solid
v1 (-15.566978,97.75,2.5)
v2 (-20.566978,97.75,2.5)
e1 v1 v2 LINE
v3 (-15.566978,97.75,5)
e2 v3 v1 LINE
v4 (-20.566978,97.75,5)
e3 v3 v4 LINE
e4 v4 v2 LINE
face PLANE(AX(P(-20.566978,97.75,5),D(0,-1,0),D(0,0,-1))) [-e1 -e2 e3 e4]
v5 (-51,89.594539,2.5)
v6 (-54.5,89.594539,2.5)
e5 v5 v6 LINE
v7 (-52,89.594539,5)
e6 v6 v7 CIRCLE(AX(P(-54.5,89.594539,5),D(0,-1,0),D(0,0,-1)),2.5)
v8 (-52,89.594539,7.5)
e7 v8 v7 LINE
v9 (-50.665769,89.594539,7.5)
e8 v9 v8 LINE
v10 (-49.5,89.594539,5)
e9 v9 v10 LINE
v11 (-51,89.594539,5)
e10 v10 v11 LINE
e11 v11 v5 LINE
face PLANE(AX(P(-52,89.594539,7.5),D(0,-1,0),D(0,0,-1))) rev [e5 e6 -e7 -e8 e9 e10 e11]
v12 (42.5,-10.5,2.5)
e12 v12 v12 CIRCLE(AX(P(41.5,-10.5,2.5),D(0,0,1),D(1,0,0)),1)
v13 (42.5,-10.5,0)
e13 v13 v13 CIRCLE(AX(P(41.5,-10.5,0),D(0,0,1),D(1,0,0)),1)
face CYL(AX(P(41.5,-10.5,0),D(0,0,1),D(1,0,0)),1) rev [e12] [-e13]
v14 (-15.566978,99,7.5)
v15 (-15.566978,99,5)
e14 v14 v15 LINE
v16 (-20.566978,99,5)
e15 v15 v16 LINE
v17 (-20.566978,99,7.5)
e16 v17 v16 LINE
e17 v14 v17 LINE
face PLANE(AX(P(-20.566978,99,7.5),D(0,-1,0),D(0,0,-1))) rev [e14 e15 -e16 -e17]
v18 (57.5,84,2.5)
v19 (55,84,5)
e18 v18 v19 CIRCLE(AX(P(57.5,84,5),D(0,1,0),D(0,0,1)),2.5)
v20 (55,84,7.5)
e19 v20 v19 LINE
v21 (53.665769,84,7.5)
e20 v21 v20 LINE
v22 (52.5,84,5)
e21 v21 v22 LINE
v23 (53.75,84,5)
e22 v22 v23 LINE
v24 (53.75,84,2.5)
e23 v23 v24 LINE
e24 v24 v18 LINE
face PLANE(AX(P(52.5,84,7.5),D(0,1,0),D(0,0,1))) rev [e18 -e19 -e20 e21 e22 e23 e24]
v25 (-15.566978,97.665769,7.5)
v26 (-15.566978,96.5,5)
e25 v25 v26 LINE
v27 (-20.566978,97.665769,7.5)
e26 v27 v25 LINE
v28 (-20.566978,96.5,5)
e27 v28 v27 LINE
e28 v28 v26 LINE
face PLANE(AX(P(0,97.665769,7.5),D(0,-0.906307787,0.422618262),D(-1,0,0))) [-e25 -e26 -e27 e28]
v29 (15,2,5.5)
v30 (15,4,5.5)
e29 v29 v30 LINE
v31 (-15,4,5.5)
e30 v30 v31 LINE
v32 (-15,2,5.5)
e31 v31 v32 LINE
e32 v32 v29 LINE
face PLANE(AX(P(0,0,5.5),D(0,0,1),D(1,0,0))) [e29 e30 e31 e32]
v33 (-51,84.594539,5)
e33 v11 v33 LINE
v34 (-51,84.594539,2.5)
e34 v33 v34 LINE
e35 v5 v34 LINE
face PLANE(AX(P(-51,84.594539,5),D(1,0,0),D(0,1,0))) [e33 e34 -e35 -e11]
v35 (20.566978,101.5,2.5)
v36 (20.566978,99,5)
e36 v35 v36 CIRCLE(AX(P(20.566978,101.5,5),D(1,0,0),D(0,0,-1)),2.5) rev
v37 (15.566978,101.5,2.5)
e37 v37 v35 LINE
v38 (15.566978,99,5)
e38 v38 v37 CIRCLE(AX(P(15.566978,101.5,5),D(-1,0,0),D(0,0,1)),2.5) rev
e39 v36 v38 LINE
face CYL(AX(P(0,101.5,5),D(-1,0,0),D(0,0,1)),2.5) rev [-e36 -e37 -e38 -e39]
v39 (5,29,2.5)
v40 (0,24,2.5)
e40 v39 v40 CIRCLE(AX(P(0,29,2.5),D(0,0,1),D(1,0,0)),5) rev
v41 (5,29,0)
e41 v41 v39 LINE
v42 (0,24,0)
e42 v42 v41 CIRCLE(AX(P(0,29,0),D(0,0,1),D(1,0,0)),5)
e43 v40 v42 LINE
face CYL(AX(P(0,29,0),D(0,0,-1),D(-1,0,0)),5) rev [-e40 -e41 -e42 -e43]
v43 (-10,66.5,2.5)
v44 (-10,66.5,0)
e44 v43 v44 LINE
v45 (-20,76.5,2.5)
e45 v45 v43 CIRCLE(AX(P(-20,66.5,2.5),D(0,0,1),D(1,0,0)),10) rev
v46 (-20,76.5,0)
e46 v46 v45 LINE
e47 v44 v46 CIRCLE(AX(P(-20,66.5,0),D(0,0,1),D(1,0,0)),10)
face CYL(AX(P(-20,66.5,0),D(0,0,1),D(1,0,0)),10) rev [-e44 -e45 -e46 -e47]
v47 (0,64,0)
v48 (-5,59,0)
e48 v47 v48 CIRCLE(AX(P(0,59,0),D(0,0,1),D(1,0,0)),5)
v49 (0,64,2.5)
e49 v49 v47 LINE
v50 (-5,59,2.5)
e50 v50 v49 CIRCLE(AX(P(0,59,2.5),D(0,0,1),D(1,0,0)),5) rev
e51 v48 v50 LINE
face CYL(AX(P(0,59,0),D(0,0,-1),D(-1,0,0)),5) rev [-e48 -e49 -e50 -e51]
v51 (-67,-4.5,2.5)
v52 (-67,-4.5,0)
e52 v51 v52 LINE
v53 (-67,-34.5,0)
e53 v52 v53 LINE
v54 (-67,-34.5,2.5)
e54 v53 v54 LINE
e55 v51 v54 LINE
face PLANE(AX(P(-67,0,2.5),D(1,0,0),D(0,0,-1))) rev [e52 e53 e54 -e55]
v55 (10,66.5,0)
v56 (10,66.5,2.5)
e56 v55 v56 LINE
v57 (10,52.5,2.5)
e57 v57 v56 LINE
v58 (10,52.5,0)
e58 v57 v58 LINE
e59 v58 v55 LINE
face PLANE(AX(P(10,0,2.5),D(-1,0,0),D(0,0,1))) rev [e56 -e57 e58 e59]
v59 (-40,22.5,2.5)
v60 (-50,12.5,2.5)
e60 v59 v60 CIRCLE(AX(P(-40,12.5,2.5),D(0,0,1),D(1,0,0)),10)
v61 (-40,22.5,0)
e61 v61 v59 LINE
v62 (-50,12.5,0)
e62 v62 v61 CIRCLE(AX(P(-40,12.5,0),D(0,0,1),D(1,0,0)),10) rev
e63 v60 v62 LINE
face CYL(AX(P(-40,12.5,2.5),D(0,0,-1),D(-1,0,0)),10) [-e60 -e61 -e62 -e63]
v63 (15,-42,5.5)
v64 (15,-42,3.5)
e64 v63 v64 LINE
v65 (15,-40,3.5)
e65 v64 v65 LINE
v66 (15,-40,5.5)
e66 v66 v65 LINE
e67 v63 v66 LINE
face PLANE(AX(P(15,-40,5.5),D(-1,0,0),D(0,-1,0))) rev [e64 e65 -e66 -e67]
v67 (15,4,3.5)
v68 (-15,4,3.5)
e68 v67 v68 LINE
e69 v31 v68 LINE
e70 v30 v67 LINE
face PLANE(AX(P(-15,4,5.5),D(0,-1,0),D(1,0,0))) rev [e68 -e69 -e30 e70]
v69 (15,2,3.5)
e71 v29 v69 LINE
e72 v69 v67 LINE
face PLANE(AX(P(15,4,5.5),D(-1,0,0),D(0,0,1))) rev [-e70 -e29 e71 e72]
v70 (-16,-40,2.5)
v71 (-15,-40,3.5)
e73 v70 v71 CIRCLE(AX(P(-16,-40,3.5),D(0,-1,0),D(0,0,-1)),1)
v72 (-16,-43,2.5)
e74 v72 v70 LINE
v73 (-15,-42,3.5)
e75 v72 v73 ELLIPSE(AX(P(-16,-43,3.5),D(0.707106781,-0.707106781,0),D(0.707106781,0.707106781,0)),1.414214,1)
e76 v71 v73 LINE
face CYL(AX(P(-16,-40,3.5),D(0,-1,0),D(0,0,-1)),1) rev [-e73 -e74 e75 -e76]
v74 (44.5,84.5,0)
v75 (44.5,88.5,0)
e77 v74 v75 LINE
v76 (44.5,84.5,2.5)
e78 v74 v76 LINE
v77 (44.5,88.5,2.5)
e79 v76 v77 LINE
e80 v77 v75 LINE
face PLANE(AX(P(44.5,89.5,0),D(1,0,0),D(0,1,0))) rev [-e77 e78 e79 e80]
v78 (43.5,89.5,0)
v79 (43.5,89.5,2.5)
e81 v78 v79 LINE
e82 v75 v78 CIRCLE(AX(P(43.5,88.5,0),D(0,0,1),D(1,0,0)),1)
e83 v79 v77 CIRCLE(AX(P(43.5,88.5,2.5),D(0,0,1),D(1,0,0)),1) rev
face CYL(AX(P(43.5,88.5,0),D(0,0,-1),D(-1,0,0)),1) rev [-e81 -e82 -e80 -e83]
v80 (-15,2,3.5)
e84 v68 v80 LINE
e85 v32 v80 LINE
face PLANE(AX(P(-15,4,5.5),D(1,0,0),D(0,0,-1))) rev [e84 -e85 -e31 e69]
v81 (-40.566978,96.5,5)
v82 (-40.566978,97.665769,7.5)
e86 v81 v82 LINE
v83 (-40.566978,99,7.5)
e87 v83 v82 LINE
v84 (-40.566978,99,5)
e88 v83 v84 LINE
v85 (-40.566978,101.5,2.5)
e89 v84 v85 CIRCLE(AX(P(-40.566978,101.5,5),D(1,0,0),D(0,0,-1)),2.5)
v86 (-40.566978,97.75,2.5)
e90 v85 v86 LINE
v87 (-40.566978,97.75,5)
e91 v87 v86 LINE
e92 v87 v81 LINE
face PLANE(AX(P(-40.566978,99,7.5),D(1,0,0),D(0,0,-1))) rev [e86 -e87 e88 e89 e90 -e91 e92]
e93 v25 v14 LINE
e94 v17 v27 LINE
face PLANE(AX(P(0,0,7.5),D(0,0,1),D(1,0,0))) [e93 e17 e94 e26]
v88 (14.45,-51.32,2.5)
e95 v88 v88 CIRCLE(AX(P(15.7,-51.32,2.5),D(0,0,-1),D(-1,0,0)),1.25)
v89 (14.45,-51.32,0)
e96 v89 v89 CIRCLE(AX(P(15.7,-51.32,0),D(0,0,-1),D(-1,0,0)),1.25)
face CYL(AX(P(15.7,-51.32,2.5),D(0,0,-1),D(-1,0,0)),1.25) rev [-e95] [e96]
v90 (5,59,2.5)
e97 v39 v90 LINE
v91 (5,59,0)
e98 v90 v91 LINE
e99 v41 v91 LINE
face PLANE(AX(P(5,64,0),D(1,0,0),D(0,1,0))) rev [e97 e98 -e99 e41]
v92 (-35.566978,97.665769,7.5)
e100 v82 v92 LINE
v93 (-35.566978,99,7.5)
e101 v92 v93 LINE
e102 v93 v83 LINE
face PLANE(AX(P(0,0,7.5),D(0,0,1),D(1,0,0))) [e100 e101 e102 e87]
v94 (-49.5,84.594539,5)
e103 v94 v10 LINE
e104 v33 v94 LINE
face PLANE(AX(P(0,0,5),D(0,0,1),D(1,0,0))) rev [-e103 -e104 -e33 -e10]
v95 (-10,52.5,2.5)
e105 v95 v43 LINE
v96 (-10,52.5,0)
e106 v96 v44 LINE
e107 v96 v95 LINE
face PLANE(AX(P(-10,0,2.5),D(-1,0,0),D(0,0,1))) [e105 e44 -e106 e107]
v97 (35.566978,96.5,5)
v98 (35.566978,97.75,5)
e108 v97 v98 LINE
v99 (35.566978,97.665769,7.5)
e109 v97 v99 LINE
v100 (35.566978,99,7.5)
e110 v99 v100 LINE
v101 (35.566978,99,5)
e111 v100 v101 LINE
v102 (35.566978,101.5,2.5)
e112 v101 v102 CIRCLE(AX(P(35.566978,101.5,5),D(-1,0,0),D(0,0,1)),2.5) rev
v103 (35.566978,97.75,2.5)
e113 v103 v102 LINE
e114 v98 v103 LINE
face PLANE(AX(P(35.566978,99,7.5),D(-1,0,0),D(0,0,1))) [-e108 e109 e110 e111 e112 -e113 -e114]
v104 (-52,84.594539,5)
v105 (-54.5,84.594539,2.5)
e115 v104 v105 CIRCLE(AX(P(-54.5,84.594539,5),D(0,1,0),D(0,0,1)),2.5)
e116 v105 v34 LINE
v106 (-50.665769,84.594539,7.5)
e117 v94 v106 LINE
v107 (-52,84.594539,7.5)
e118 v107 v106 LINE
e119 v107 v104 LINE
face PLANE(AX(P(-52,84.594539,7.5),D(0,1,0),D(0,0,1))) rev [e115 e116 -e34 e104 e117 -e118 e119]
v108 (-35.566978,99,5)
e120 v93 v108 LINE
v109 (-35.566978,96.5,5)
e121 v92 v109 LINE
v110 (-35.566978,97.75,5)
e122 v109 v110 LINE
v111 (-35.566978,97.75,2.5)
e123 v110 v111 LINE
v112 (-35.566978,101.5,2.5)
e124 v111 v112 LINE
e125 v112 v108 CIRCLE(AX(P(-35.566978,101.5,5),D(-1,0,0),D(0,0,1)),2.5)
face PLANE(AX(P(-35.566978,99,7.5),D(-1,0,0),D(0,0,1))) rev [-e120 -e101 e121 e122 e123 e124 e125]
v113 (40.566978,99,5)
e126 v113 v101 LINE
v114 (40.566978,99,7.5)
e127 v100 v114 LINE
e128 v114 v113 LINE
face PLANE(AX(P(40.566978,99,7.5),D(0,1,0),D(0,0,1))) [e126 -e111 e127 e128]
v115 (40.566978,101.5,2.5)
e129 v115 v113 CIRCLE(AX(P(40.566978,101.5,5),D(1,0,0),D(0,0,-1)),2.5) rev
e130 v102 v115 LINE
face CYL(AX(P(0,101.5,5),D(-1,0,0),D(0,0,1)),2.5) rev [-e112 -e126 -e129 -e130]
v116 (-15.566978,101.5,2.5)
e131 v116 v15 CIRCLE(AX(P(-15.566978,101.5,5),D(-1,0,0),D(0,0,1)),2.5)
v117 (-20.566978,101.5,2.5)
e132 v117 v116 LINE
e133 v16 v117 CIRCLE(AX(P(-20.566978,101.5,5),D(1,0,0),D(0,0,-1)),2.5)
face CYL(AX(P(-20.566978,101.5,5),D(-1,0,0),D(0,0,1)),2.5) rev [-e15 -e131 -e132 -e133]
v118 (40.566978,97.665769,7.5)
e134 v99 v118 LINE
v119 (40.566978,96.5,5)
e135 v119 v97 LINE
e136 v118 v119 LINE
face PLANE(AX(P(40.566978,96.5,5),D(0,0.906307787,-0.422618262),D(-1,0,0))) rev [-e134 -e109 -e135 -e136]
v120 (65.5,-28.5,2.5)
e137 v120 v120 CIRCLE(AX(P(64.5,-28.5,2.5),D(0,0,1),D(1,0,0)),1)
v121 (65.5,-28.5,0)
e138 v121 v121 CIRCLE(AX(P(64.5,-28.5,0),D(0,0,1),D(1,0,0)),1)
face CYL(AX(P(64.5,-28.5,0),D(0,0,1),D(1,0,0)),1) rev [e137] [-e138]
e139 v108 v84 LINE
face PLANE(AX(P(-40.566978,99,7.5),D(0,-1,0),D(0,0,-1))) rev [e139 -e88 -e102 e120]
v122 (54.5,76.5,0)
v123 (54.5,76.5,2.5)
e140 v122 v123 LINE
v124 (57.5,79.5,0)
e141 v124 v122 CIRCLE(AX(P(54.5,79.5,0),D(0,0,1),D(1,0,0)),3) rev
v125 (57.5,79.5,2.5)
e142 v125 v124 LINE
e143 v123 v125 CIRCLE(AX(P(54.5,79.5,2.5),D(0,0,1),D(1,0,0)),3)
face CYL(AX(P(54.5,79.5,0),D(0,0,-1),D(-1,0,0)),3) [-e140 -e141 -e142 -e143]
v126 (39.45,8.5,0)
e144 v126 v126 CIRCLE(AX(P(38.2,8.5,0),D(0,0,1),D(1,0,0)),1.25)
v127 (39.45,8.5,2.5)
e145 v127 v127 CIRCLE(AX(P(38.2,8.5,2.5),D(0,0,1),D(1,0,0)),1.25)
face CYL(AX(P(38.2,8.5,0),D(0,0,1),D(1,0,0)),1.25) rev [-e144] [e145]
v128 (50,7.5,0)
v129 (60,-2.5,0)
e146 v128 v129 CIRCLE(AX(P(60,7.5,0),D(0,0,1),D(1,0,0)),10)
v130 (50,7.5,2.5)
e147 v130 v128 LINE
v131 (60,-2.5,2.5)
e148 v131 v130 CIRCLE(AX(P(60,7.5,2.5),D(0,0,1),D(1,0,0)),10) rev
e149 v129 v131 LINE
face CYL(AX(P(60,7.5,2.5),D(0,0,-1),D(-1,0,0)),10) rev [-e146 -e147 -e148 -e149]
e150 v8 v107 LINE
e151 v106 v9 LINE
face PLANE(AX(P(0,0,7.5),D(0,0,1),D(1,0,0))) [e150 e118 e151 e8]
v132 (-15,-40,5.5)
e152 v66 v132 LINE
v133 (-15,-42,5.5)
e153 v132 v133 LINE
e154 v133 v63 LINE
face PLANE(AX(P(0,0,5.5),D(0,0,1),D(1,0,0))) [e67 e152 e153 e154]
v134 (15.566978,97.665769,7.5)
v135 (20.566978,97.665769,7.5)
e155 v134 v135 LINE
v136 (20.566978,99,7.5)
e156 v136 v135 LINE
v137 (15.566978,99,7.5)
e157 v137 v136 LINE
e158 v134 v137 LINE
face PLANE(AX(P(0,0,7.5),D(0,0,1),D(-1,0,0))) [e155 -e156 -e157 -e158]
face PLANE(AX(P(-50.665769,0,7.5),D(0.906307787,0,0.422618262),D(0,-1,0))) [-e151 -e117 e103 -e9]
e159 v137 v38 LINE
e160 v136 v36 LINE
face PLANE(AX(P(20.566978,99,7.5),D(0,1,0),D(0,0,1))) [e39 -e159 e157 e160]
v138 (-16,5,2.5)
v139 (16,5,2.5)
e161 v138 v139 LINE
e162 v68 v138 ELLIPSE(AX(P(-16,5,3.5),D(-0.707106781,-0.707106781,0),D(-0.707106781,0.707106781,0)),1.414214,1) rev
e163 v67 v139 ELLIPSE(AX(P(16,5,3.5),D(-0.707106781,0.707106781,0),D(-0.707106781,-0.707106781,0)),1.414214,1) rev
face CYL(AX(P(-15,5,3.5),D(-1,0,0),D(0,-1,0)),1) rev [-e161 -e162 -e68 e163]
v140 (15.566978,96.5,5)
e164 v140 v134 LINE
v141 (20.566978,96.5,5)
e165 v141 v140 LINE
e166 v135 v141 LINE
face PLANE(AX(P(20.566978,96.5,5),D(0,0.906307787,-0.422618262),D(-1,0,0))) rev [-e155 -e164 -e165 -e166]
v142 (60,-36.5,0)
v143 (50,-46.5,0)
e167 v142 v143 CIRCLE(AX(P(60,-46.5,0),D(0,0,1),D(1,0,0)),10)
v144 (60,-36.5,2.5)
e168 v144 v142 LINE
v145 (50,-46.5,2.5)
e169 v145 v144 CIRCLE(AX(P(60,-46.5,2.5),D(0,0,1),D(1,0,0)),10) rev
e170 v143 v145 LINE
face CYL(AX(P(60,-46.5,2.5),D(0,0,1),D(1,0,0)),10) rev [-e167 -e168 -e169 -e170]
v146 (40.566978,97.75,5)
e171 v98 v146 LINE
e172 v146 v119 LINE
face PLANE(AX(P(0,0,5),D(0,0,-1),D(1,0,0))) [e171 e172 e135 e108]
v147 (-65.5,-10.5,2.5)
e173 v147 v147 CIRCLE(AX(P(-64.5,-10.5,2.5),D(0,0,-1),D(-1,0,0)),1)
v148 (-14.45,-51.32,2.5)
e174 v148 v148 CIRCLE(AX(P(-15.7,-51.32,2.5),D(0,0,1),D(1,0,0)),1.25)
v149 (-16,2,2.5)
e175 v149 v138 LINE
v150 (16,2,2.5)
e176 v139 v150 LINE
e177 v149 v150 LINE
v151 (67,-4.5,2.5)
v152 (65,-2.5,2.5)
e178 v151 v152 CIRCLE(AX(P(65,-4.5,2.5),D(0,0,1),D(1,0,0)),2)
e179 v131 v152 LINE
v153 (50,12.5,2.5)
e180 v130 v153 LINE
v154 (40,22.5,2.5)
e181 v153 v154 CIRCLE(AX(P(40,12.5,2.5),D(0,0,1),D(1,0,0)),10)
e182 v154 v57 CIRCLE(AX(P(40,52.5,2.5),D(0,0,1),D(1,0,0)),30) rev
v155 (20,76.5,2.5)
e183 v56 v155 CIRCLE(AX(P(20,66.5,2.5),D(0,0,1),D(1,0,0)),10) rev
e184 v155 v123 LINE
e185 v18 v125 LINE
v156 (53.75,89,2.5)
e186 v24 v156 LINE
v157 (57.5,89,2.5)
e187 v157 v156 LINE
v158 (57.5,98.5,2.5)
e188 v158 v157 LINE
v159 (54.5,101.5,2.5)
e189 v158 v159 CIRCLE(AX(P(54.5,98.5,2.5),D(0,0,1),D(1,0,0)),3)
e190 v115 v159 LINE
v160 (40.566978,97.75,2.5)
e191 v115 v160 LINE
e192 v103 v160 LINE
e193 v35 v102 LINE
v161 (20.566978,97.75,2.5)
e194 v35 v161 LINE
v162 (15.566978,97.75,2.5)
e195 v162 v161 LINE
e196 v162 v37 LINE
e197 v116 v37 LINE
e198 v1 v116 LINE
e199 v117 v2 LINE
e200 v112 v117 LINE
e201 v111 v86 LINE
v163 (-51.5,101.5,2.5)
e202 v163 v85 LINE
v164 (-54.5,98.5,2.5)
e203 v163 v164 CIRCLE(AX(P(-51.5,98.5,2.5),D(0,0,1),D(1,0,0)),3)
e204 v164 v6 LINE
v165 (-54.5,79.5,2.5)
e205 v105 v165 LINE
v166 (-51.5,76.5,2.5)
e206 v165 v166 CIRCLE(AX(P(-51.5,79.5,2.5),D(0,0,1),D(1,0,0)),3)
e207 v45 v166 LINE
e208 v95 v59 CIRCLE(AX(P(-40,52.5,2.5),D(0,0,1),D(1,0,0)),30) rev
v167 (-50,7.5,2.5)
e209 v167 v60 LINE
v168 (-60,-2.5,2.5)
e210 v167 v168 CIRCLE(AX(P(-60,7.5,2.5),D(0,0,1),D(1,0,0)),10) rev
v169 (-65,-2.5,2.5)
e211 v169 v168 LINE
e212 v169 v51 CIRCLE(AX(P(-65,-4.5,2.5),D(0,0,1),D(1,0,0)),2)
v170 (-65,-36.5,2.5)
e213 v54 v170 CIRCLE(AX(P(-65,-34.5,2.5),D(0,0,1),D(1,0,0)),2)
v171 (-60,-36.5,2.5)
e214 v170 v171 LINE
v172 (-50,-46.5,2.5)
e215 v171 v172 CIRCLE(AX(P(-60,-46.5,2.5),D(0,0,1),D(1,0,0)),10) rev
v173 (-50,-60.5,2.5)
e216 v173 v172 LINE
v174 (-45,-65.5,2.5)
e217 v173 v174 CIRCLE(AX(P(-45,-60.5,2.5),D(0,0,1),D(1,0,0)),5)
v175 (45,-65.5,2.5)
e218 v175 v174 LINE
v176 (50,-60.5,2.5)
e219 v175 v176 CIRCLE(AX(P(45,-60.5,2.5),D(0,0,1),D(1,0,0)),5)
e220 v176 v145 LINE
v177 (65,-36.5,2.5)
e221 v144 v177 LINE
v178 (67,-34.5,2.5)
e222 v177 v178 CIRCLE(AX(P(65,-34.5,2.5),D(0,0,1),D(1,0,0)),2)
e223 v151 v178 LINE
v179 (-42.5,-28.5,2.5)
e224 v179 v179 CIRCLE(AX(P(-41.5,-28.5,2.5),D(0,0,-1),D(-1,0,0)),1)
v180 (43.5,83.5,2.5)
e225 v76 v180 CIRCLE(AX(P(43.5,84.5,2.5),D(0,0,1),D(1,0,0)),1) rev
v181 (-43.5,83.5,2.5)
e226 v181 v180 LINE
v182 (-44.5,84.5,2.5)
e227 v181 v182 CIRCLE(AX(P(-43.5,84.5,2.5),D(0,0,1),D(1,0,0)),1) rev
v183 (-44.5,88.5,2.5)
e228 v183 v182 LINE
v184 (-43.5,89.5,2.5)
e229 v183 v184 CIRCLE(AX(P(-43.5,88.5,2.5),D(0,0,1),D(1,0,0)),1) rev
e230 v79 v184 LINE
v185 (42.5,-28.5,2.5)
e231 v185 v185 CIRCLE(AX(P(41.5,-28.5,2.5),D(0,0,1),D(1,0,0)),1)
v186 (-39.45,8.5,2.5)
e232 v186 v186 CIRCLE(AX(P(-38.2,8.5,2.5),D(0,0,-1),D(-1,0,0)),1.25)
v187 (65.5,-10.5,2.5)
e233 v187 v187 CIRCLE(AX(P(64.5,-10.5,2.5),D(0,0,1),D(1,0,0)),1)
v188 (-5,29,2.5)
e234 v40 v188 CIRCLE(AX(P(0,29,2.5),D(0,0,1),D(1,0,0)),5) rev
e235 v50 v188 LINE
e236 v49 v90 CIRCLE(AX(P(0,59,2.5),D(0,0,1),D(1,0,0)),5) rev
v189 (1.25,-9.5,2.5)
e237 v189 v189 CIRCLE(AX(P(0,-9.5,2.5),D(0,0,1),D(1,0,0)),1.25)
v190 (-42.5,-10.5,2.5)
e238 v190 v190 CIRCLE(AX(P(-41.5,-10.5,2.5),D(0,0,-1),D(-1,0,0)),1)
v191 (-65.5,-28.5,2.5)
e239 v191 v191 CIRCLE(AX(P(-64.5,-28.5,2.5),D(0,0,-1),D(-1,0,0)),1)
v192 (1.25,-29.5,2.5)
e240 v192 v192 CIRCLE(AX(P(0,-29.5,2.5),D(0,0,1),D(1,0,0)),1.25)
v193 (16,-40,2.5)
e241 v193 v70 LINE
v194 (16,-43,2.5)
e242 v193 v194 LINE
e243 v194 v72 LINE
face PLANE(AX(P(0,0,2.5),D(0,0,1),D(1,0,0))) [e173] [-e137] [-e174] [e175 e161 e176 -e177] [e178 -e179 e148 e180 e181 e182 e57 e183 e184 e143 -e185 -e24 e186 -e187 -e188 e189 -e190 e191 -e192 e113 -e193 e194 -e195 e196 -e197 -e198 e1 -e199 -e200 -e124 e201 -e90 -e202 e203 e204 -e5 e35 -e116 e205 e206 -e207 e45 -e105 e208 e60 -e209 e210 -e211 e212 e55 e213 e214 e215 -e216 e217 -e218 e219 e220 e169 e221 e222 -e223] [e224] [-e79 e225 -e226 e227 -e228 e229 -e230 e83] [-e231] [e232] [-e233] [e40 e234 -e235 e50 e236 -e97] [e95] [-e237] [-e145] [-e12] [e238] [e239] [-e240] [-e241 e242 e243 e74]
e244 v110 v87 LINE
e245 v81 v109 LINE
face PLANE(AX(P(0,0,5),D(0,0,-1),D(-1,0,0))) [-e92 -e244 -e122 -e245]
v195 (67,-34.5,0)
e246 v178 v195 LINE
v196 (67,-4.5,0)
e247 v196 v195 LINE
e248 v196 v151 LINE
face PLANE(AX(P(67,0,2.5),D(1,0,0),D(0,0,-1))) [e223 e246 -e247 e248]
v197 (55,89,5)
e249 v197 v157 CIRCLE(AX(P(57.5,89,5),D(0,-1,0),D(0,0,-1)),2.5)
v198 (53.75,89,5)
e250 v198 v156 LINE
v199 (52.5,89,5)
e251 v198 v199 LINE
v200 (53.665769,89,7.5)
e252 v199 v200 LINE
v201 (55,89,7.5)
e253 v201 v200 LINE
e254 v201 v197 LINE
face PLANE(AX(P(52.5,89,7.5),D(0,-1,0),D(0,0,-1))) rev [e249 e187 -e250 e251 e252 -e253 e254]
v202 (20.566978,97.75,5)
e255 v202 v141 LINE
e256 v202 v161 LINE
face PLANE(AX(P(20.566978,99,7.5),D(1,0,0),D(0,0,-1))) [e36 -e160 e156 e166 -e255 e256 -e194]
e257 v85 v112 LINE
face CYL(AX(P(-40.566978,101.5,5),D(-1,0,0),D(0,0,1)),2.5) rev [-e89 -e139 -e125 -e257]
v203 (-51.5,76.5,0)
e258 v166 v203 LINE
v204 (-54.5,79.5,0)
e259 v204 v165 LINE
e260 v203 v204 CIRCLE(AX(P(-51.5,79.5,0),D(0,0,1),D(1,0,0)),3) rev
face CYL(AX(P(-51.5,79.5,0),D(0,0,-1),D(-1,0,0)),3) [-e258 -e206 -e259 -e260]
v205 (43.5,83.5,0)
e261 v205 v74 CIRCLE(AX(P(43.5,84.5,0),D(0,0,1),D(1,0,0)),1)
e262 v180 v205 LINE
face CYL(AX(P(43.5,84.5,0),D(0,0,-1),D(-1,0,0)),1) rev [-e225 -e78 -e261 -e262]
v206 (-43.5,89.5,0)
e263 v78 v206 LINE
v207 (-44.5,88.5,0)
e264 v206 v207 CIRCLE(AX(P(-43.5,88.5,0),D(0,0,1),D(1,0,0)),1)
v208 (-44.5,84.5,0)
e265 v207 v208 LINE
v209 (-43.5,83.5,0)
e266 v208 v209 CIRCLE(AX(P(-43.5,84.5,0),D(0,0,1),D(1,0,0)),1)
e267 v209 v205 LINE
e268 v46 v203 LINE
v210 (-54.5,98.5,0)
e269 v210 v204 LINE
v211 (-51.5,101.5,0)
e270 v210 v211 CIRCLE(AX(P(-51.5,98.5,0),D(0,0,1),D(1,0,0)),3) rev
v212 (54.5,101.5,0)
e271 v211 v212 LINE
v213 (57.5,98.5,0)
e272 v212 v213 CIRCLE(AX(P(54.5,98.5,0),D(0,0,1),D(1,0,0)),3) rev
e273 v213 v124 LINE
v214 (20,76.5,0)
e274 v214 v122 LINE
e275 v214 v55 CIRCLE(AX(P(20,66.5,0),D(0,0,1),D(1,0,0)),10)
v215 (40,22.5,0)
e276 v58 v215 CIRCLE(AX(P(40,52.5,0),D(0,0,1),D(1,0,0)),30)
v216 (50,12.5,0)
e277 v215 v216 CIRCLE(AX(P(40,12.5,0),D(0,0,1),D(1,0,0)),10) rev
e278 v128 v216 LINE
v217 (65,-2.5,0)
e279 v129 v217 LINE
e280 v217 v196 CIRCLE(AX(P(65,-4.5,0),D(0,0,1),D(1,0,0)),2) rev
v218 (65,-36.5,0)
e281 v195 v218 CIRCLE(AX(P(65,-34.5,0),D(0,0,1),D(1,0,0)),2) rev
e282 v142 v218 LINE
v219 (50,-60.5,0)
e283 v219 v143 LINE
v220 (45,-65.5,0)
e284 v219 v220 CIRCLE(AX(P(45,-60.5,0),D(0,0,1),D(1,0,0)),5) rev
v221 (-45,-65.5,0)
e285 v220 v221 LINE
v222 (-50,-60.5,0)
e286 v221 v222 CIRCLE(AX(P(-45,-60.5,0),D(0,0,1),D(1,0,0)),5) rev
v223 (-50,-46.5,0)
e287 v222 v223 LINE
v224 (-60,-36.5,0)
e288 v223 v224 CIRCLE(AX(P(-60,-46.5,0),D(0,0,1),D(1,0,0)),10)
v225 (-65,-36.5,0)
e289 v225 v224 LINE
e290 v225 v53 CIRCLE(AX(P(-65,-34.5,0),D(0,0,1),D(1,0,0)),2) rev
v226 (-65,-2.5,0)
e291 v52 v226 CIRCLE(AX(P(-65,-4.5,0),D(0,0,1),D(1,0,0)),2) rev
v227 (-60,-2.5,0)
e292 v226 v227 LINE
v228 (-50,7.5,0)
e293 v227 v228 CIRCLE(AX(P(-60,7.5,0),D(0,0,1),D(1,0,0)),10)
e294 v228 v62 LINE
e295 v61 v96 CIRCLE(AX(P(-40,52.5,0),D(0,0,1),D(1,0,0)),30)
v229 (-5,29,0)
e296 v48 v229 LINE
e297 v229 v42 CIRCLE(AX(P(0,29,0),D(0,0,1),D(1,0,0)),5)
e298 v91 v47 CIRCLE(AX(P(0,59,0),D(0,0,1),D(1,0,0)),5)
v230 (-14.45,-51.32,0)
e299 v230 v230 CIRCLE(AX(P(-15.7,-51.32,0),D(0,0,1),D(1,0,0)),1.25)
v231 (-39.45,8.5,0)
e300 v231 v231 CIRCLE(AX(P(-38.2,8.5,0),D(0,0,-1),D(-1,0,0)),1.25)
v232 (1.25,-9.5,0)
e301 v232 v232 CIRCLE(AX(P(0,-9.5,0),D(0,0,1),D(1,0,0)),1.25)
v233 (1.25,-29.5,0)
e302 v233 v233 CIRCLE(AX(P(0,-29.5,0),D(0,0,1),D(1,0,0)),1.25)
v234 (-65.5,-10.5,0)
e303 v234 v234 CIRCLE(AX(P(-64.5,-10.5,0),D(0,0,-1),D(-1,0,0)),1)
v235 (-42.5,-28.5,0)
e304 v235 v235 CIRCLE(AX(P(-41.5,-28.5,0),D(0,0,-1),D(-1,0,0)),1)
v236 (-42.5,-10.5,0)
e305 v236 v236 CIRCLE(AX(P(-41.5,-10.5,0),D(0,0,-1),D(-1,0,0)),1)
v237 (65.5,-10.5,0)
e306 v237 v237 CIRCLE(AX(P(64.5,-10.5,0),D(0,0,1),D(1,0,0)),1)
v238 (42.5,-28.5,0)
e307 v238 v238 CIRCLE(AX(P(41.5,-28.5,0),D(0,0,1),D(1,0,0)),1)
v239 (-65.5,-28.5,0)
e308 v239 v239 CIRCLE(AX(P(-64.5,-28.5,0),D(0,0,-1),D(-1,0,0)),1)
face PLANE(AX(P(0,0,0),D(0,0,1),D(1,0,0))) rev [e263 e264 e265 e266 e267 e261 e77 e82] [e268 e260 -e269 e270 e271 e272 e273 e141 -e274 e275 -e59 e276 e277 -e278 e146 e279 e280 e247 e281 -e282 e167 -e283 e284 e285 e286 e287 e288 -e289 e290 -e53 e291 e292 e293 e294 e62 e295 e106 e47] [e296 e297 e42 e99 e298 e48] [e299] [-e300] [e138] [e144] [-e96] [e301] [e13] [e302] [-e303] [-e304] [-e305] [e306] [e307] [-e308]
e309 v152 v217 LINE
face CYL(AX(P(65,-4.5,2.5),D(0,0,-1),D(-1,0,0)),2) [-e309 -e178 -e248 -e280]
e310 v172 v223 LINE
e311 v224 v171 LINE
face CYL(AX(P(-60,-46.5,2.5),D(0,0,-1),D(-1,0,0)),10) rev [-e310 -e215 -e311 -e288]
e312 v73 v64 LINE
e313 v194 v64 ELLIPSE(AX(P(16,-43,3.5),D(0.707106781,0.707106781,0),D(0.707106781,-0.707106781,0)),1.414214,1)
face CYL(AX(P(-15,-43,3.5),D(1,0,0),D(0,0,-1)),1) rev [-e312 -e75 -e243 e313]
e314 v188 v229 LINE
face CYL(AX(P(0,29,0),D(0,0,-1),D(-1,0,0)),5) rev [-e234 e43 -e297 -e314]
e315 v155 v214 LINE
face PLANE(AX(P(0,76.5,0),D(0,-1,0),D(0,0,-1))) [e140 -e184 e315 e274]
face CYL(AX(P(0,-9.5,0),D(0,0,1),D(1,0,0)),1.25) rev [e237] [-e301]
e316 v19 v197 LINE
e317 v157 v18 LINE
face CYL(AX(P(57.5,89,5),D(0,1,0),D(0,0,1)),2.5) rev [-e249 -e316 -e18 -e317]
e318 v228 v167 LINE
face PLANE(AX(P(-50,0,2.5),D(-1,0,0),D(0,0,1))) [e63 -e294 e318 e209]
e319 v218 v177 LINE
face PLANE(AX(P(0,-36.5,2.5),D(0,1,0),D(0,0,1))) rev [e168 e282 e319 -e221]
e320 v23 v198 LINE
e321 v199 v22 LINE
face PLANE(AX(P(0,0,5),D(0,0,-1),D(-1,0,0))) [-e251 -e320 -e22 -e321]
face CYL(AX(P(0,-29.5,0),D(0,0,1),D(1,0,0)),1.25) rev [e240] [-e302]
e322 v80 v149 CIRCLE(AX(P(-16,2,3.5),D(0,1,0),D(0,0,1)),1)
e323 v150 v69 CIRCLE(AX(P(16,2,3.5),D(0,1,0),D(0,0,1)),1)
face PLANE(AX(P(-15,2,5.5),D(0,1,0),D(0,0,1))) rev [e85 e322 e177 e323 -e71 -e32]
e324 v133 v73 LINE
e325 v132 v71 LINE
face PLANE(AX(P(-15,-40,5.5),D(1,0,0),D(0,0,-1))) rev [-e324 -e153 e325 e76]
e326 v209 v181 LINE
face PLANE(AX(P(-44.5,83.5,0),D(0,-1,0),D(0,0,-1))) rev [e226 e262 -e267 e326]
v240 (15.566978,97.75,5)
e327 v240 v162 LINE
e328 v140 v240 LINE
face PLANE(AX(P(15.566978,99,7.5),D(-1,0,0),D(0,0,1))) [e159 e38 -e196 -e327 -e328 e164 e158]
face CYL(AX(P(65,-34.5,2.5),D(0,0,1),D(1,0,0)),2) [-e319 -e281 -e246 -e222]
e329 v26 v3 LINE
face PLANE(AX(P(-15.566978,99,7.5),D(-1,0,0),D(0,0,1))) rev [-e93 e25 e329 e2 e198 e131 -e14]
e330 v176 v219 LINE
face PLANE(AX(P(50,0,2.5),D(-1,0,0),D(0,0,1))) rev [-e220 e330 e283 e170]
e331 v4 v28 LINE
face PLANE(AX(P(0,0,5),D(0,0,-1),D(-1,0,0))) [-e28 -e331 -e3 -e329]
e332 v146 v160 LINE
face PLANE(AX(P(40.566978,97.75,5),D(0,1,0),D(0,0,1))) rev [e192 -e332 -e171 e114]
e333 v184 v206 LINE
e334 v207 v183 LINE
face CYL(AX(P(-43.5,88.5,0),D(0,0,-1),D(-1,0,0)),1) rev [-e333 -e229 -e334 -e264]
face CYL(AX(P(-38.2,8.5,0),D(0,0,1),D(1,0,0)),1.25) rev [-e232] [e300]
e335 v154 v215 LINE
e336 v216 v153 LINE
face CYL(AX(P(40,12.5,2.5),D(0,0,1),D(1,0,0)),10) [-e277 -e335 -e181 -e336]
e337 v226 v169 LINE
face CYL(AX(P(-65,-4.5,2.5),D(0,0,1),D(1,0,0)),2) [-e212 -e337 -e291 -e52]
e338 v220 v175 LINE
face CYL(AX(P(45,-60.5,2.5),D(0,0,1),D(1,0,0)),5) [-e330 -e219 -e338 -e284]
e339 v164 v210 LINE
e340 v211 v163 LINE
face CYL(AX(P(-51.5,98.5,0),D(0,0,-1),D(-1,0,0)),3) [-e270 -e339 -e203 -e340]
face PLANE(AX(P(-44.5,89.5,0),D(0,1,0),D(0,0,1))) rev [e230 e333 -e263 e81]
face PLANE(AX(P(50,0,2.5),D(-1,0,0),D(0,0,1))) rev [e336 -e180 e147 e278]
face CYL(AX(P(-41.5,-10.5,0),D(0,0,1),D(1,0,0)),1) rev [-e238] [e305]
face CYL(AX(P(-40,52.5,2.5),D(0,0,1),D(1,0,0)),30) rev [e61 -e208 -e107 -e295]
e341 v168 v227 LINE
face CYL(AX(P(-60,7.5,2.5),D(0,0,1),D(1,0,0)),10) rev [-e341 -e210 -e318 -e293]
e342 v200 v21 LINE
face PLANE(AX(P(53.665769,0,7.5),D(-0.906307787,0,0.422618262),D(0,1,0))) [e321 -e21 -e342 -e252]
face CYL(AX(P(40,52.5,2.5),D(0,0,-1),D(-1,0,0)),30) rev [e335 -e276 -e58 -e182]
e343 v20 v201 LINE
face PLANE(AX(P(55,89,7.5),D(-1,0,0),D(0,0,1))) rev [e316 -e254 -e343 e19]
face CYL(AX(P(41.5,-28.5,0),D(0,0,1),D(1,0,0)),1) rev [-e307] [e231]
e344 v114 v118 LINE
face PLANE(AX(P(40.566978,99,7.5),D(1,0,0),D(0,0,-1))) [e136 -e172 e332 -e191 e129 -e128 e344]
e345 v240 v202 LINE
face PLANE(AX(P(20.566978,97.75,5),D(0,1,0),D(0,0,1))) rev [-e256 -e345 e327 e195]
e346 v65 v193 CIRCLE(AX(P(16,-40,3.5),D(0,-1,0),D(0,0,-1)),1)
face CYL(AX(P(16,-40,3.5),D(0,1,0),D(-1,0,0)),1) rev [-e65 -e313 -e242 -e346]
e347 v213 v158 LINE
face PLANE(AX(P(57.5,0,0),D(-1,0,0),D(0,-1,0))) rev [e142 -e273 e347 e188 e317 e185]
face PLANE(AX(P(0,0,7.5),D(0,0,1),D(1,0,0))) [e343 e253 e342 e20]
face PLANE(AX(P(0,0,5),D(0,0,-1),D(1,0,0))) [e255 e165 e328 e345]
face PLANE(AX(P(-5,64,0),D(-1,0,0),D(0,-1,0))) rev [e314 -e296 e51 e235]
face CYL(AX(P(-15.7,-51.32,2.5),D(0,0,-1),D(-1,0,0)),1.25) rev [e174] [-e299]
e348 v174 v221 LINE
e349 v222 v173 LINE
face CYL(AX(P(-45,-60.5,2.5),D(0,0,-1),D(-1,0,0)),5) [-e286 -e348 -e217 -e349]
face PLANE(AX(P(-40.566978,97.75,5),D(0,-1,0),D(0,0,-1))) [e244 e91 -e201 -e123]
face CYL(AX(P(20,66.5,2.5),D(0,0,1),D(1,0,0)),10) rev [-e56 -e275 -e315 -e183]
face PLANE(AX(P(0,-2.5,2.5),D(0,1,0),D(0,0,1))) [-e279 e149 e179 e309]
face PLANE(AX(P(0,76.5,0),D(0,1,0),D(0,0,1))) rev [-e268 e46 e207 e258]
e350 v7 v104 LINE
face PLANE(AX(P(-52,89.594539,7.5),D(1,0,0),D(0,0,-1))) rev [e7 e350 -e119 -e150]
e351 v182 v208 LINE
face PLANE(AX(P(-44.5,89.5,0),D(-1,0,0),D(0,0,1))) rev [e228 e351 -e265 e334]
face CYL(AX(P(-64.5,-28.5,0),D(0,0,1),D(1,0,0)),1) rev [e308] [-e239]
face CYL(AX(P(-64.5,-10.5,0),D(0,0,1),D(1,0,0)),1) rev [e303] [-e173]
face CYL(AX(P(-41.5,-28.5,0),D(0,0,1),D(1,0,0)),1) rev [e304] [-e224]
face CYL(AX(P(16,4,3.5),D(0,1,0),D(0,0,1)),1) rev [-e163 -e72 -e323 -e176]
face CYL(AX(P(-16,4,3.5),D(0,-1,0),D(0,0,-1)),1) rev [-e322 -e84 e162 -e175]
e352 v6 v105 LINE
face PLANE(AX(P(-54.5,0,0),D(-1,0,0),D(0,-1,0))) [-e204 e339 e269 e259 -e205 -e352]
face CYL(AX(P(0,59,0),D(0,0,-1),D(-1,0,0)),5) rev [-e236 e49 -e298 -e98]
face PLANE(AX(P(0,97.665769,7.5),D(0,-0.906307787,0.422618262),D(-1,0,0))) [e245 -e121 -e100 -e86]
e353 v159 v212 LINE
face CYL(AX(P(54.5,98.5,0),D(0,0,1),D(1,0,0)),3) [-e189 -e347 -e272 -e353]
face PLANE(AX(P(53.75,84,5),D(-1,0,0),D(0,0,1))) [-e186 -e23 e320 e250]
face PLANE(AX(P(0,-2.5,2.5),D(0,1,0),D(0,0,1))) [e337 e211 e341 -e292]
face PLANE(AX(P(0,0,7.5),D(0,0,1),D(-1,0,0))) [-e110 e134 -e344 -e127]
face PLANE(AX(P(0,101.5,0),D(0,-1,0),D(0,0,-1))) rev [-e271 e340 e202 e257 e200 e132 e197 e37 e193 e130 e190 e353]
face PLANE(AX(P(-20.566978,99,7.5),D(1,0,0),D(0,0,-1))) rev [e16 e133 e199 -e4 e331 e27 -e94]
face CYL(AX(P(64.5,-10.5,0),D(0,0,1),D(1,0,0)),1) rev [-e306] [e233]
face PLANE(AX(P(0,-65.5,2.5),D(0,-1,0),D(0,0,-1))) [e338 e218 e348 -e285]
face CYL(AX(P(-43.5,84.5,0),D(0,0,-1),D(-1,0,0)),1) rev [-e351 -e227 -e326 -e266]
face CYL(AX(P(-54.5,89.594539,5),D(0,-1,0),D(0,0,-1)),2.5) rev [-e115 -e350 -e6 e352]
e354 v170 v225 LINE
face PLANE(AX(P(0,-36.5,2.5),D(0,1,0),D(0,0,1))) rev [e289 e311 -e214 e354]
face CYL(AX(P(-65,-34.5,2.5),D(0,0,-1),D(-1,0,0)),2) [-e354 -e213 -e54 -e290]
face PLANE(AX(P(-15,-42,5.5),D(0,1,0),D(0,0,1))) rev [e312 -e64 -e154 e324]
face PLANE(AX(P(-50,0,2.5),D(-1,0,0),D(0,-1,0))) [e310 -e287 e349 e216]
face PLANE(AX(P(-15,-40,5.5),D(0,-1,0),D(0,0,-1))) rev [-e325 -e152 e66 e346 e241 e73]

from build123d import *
from OCP.BRepFilletAPI import BRepFilletAPI_MakeChamfer

# Parameters (mm, degrees)
SALIENTE_EXTRUIR1_DEPTH      = 2.5
REDONDEO1_R                  = 10
REDONDEO2_R                  = 30
REDONDEO3_R                  = 5
REDONDEO4_R                  = 2
CROQUIS2_R                   = 1.25
CORTAR_EXTRUIR1_DEPTH        = 2.5
CROQUIS3_W                   = 30
CROQUIS3_H                   = 2
SALIENTE_EXTRUIR2_DEPTH      = 3
CROQUIS4_R                   = 1
CROQUIS4_R_2                 = 1.25
CORTAR_EXTRUIR2_DEPTH        = 2.5
CROQUIS5_R                   = 1.25
CORTAR_EXTRUIR3_DEPTH        = 2.5
CROQUIS6_W                   = 30
CROQUIS6_H                   = 2
SALIENTE_EXTRUIR3_DEPTH      = 3
REDONDEO5_R                  = 1
SALIENTE_EXTRUIR6_DEPTH      = 2.5
REDONDEO7_R                  = 10
REDONDEO8_R                  = 3
CROQUIS8_W                   = 89
CROQUIS8_H                   = 6
CORTAR_EXTRUIR5_DEPTH        = 2.5
REDONDEO10_R                 = 1
CROQUIS9_W                   = 2.5
CROQUIS9_H                   = 5
SALIENTE_EXTRUIR7_DEPTH      = 5
REDONDEO11_R                 = 2.5
CROQUIS10_W                  = 1.5
CROQUIS10_H                  = 5
CORTAR_EXTRUIR6_DEPTH        = 2.5
CHAFL_N1_SIZE2               = 2.5
CHAFL_N1_SIZE                = 1.165769145
CROQUIS11_W                  = 2.5
CROQUIS11_H                  = 5
SALIENTE_EXTRUIR8_DEPTH      = 5
CROQUIS12_W                  = 1.25
CROQUIS12_H                  = 5
CORTAR_EXTRUIR7_DEPTH        = 2.5
CHAFL_N2_SIZE2               = 1.165769145
CHAFL_N2_SIZE                = 2.5
REDONDEO13_R                 = 2.5
CROQUIS13_W                  = 5
CROQUIS13_H                  = 2.5
SALIENTE_EXTRUIR9_DEPTH      = 5
REDONDEO14_R                 = 2.5
CROQUIS14_W                  = 5
CROQUIS14_H                  = 1.25
CORTAR_EXTRUIR8_DEPTH        = 2.5
CHAFL_N3_SIZE                = 1.165769145
CHAFL_N3_SIZE_2              = 2.5
REDONDEO14_OF_SIMETR_A4_R    = 2.5
CHAFL_N3_OF_SIMETR_A4_SIZE   = 1.165769145
CHAFL_N3_OF_SIMETR_A4_SIZE_2 = 2.5
CROQUIS17_W                  = 10
CROQUIS17_H                  = 40
CORTAR_EXTRUIR9_DEPTH        = 2.5
REDONDEO19_R                 = 5


with BuildPart() as part:
    # Croquis1 → Saliente-Extruir1 (new body)
    with BuildSketch(Plane.XY):
        Polygon((10, 22.5), (10, 65.5), (-10, 65.5), (-10, 22.5), (-50, 22.5), (-50, -2.5), (-67, -2.5), (-67, -36.5), (-50, -36.5), (-50, -65.5), (50, -65.5), (50, -36.5), (67, -36.5), (67, -2.5), (50, -2.5), (50, 22.5), align=None)
    extrude(amount=SALIENTE_EXTRUIR1_DEPTH)

    # Redondeo1
    redondeo1_edges = [part.edges().sort_by_distance(p)[0] for p in [
        (-50, -36.5, 1.25),
        (-50, -2.5, 1.25),
        (-50, 22.5, 1.25),
        (50, 22.5, 1.25),
        (50, -2.5, 1.25),
        (50, -36.5, 1.25),
    ]]
    fillet(redondeo1_edges, radius=REDONDEO1_R)

    # Redondeo2
    redondeo2_edges = [part.edges().sort_by_distance(p)[0] for p in [
        (10, 22.5, 1.25),
        (-10, 22.5, 1.25),
    ]]
    fillet(redondeo2_edges, radius=REDONDEO2_R - 0.0001)  # a hair under: the kernel refuses the full size

    # Redondeo3
    redondeo3_edges = [part.edges().sort_by_distance(p)[0] for p in [
        (50, -65.5, 1.25),
        (-50, -65.5, 1.25),
    ]]
    fillet(redondeo3_edges, radius=REDONDEO3_R)

    # Redondeo4
    redondeo4_edges = [part.edges().sort_by_distance(p)[0] for p in [
        (-67, -36.5, 1.25),
        (-67, -2.5, 1.25),
        (67, -2.5, 1.25),
        (67, -36.5, 1.25),
    ]]
    fillet(redondeo4_edges, radius=REDONDEO4_R)

    # Croquis2 → Cortar-Extruir1 (cut)
    with BuildSketch(Plane(origin=(0, 0, 0), x_dir=(-1, 0, 0), z_dir=(0, 0, -1))):
        with Locations((-15.7, -51.32)):
            Circle(CROQUIS2_R)
    cortar_extruir1 = extrude(amount=-CORTAR_EXTRUIR1_DEPTH, mode=Mode.SUBTRACT)

    # Simetría1: Cortar-Extruir1 across plane
    add(cortar_extruir1.mirror(Plane(origin=(0, 0, 0), x_dir=(0, 0, 1), z_dir=(1, 0, 0))), mode=Mode.SUBTRACT)

    # Croquis3 → Saliente-Extruir2 (add)
    with BuildSketch(Plane.XY.offset(2.5)):
        with Locations((0, -41)):
            Rectangle(CROQUIS3_W, CROQUIS3_H)
    extrude(amount=SALIENTE_EXTRUIR2_DEPTH)

    # Croquis4 → Cortar-Extruir2 (cut)
    with BuildSketch(Plane.XY.offset(2.5)):
        with Locations((64.5, -28.5)):
            Circle(CROQUIS4_R)
        with Locations((64.5, -10.5)):
            Circle(CROQUIS4_R)
        with Locations((41.5, -28.5)):
            Circle(CROQUIS4_R)
        with Locations((41.5, -10.5)):
            Circle(CROQUIS4_R)
        with Locations((0, -9.5)):
            Circle(CROQUIS4_R_2)
        with Locations((0, -29.5)):
            Circle(CROQUIS4_R_2)
    cortar_extruir2 = extrude(amount=-CORTAR_EXTRUIR2_DEPTH, mode=Mode.SUBTRACT)

    # Simetría2: Cortar-Extruir2 across plane
    add(cortar_extruir2.mirror(Plane(origin=(0, 0, 0), x_dir=(0, 0, 1), z_dir=(1, 0, 0))), mode=Mode.SUBTRACT)

    # Croquis5 → Cortar-Extruir3 (cut)
    with BuildSketch(Plane.XY.offset(2.5)):
        with Locations((38.2, 8.5)):
            Circle(CROQUIS5_R)
    cortar_extruir3 = extrude(amount=-CORTAR_EXTRUIR3_DEPTH, mode=Mode.SUBTRACT)

    # Simetría3: Cortar-Extruir3 across plane
    add(cortar_extruir3.mirror(Plane(origin=(0, 0, 0), x_dir=(0, 0, 1), z_dir=(1, 0, 0))), mode=Mode.SUBTRACT)

    # Croquis6 → Saliente-Extruir3 (add)
    with BuildSketch(Plane.XY.offset(2.5)):
        with Locations((0, 3)):
            Rectangle(CROQUIS6_W, CROQUIS6_H)
    extrude(amount=SALIENTE_EXTRUIR3_DEPTH)

    # Redondeo5
    redondeo5_edges = [part.edges().sort_by_distance(p)[0] for p in [
        (-15, -41, 2.5),
        (0, -42, 2.5),
        (15, -41, 2.5),
        (-15, 3, 2.5),
        (15, 3, 2.5),
        (0, 4, 2.5),
    ]]
    fillet(redondeo5_edges, radius=REDONDEO5_R)

    # Croquis7 → Saliente-Extruir6 (add)
    with BuildSketch(Plane.XY.offset(2.5)):
        Polygon((10, 65.5), (10, 76.5), (57.5, 76.5), (57.5, 101.5), (-54.5, 101.5), (-54.5, 76.5), (-10, 76.5), (-10, 65.5), align=None)
    extrude(amount=-SALIENTE_EXTRUIR6_DEPTH)

    # Redondeo7
    redondeo7_edges = [part.edges().sort_by_distance(p)[0] for p in [
        (10, 76.5, 1.25),
        (-10, 76.5, 1.25),
    ]]
    fillet(redondeo7_edges, radius=REDONDEO7_R)

    # Redondeo8
    redondeo8_edges = [part.edges().sort_by_distance(p)[0] for p in [
        (-54.5, 76.5, 1.25),
        (-54.5, 101.5, 1.25),
        (57.5, 101.5, 1.25),
        (57.5, 76.5, 1.25),
    ]]
    fillet(redondeo8_edges, radius=REDONDEO8_R)

    # Croquis8 → Cortar-Extruir5 (cut)
    with BuildSketch(Plane.XY.offset(2.5)):
        with Locations((0, 86.5)):
            Rectangle(CROQUIS8_W, CROQUIS8_H)
    extrude(amount=-CORTAR_EXTRUIR5_DEPTH, mode=Mode.SUBTRACT)

    # Redondeo10
    redondeo10_edges = [part.edges().sort_by_distance(p)[0] for p in [
        (-44.5, 83.5, 1.25),
        (-44.5, 89.5, 1.25),
        (44.5, 89.5, 1.25),
        (44.5, 83.5, 1.25),
    ]]
    fillet(redondeo10_edges, radius=REDONDEO10_R)

    # Croquis9 → Saliente-Extruir7 (add)
    with BuildSketch(Plane.XY.offset(2.5)):
        with Locations((-50.75, 87.094539416)):
            Rectangle(CROQUIS9_W, CROQUIS9_H)
    extrude(amount=SALIENTE_EXTRUIR7_DEPTH)

    # Redondeo11
    redondeo11_edges = [part.edges().sort_by_distance(p)[0] for p in [
        (-52, 87.094539416, 2.5),
    ]]
    fillet(redondeo11_edges, radius=REDONDEO11_R - 0.0001)  # a hair under: the kernel refuses the full size

    # Croquis10 → Cortar-Extruir6 (cut)
    with BuildSketch(Plane.XY.offset(2.5)):
        with Locations((-50.25, 87.094539416)):
            Rectangle(CROQUIS10_W, CROQUIS10_H)
    extrude(amount=CORTAR_EXTRUIR6_DEPTH, mode=Mode.SUBTRACT)

    # Chaflán1
    chafl_n1_edges = [part.edges().sort_by_distance(p)[0] for p in [
        (-49.5, 87.094539416, 7.5),
    ]]
    chafl_n1_side = [part.faces().sort_by_distance(p)[0] for p in [
        (-49.523315383, 87.094539416, 7.5),
    ]]
    chamfer(chafl_n1_edges, length=CHAFL_N1_SIZE - 0.0001, length2=CHAFL_N1_SIZE2 - 0.0001, reference=chafl_n1_side[0])  # a hair under: the kernel refuses the full size

    # Croquis11 → Saliente-Extruir8 (add)
    with BuildSketch(Plane.XY.offset(2.5)):
        with Locations((53.75, 86.5)):
            Rectangle(CROQUIS11_W, CROQUIS11_H)
    extrude(amount=SALIENTE_EXTRUIR8_DEPTH)

    # Croquis12 → Cortar-Extruir7 (cut)
    with BuildSketch(Plane.XY.offset(2.5)):
        with Locations((53.125, 86.5)):
            Rectangle(CROQUIS12_W, CROQUIS12_H)
    extrude(amount=CORTAR_EXTRUIR7_DEPTH, mode=Mode.SUBTRACT)

    # Chaflán2
    chafl_n2_edges = [part.edges().sort_by_distance(p)[0] for p in [
        (52.5, 86.5, 7.5),
    ]]
    chafl_n2_side = [part.faces().sort_by_distance(p)[0] for p in [
        (52.5, 86.5, 7.476684617),
    ]]
    chamfer(chafl_n2_edges, length=CHAFL_N2_SIZE - 0.0001, length2=CHAFL_N2_SIZE2 - 0.0001, reference=chafl_n2_side[0])  # a hair under: the kernel refuses the full size

    # Redondeo13
    redondeo13_edges = [part.edges().sort_by_distance(p)[0] for p in [
        (55, 86.5, 2.5),
    ]]
    fillet(redondeo13_edges, radius=REDONDEO13_R - 0.0001)  # a hair under: the kernel refuses the full size

    # Croquis13 → Saliente-Extruir9 (add)
    with BuildSketch(Plane.XY.offset(2.5)):
        with Locations((-38.066978344, 97.75)):
            Rectangle(CROQUIS13_W, CROQUIS13_H)
        with Locations((-18.066978344, 97.75)):
            Rectangle(CROQUIS13_W, CROQUIS13_H)
    saliente_extruir9 = extrude(amount=SALIENTE_EXTRUIR9_DEPTH)

    # Redondeo14
    redondeo14_edges = [part.edges().sort_by_distance(p)[0] for p in [
        (-38.066978344, 99, 2.5),
        (-18.066978344, 99, 2.5),
    ]]
    fillet(redondeo14_edges, radius=REDONDEO14_R - 0.0001)  # a hair under: the kernel refuses the full size

    # Croquis14 → Cortar-Extruir8 (cut)
    with BuildSketch(Plane.XY.offset(2.5)):
        with Locations((-38.066978344, 97.125)):
            Rectangle(CROQUIS14_W, CROQUIS14_H)
        with Locations((-18.066978344, 97.125)):
            Rectangle(CROQUIS14_W, CROQUIS14_H)
    cortar_extruir8 = extrude(amount=CORTAR_EXTRUIR8_DEPTH, mode=Mode.SUBTRACT)

    # Chaflán3
    chafl_n3_edges_1 = [part.edges().sort_by_distance(p)[0] for p in [
        (-18.066978344, 96.5, 7.5),
    ]]
    chafl_n3_side_1 = [part.faces().sort_by_distance(p)[0] for p in [
        (-18.066978344, 96.523315383, 7.5),
    ]]
    chafl_n3_edges_2 = [part.edges().sort_by_distance(p)[0] for p in [
        (-38.066978344, 96.5, 7.5),
    ]]
    chafl_n3_side_2 = [part.faces().sort_by_distance(p)[0] for p in [
        (-38.066978344, 96.523315383, 7.5),
    ]]
    chafl_n3 = BRepFilletAPI_MakeChamfer(part.part.solid().wrapped)
    for e in chafl_n3_edges_1:
        chafl_n3.Add(CHAFL_N3_SIZE - 0.0001, CHAFL_N3_SIZE_2 - 0.0001, e.wrapped, chafl_n3_side_1[0].wrapped)
    for e in chafl_n3_edges_2:
        chafl_n3.Add(CHAFL_N3_SIZE - 0.0001, CHAFL_N3_SIZE_2 - 0.0001, e.wrapped, chafl_n3_side_2[0].wrapped)
    add(Compound.cast(chafl_n3.Shape()), mode=Mode.REPLACE)  # a hair under: the kernel refuses the full size

    # Simetría4: Saliente-Extruir9, Cortar-Extruir8 across plane
    add(saliente_extruir9.mirror(Plane(origin=(0, 0, 0), x_dir=(0, 0, 1), z_dir=(1, 0, 0))))
    add(cortar_extruir8.mirror(Plane(origin=(0, 0, 0), x_dir=(0, 0, 1), z_dir=(1, 0, 0))), mode=Mode.SUBTRACT)

    # Redondeo14 of Simetría4
    redondeo14_of_simetr_a4_edges = [part.edges().sort_by_distance(p)[0] for p in [
        (38.066978344, 99, 2.5),
        (18.066978344, 99, 2.5),
    ]]
    fillet(redondeo14_of_simetr_a4_edges, radius=REDONDEO14_OF_SIMETR_A4_R - 0.0001)  # a hair under: the kernel refuses the full size

    # Chaflán3 of Simetría4
    chafl_n3_of_simetr_a4_edges_1 = [part.edges().sort_by_distance(p)[0] for p in [
        (18.066978344, 96.5, 7.5),
    ]]
    chafl_n3_of_simetr_a4_side_1 = [part.faces().sort_by_distance(p)[0] for p in [
        (18.066978344, 96.523315383, 7.5),
    ]]
    chafl_n3_of_simetr_a4_edges_2 = [part.edges().sort_by_distance(p)[0] for p in [
        (38.066978344, 96.5, 7.5),
    ]]
    chafl_n3_of_simetr_a4_side_2 = [part.faces().sort_by_distance(p)[0] for p in [
        (38.066978344, 96.523315383, 7.5),
    ]]
    chafl_n3_of_simetr_a4 = BRepFilletAPI_MakeChamfer(part.part.solid().wrapped)
    for e in chafl_n3_of_simetr_a4_edges_1:
        chafl_n3_of_simetr_a4.Add(CHAFL_N3_OF_SIMETR_A4_SIZE - 0.0001, CHAFL_N3_OF_SIMETR_A4_SIZE_2 - 0.0001, e.wrapped, chafl_n3_of_simetr_a4_side_1[0].wrapped)
    for e in chafl_n3_of_simetr_a4_edges_2:
        chafl_n3_of_simetr_a4.Add(CHAFL_N3_OF_SIMETR_A4_SIZE - 0.0001, CHAFL_N3_OF_SIMETR_A4_SIZE_2 - 0.0001, e.wrapped, chafl_n3_of_simetr_a4_side_2[0].wrapped)
    add(Compound.cast(chafl_n3_of_simetr_a4.Shape()), mode=Mode.REPLACE)  # a hair under: the kernel refuses the full size

    # Croquis17 → Cortar-Extruir9 (cut)
    with BuildSketch(Plane.XY.offset(2.5)):
        with Locations((0, 44)):
            Rectangle(CROQUIS17_W, CROQUIS17_H)
    extrude(amount=-CORTAR_EXTRUIR9_DEPTH, mode=Mode.SUBTRACT)

    # Redondeo19
    redondeo19_edges = [part.edges().sort_by_distance(p)[0] for p in [
        (-5, 24, 1.25),
        (5, 24, 1.25),
        (5, 64, 1.25),
        (-5, 64, 1.25),
    ]]
    fillet(redondeo19_edges, radius=REDONDEO19_R - 0.0001)  # a hair under: the kernel refuses the full size


solid = part.part
